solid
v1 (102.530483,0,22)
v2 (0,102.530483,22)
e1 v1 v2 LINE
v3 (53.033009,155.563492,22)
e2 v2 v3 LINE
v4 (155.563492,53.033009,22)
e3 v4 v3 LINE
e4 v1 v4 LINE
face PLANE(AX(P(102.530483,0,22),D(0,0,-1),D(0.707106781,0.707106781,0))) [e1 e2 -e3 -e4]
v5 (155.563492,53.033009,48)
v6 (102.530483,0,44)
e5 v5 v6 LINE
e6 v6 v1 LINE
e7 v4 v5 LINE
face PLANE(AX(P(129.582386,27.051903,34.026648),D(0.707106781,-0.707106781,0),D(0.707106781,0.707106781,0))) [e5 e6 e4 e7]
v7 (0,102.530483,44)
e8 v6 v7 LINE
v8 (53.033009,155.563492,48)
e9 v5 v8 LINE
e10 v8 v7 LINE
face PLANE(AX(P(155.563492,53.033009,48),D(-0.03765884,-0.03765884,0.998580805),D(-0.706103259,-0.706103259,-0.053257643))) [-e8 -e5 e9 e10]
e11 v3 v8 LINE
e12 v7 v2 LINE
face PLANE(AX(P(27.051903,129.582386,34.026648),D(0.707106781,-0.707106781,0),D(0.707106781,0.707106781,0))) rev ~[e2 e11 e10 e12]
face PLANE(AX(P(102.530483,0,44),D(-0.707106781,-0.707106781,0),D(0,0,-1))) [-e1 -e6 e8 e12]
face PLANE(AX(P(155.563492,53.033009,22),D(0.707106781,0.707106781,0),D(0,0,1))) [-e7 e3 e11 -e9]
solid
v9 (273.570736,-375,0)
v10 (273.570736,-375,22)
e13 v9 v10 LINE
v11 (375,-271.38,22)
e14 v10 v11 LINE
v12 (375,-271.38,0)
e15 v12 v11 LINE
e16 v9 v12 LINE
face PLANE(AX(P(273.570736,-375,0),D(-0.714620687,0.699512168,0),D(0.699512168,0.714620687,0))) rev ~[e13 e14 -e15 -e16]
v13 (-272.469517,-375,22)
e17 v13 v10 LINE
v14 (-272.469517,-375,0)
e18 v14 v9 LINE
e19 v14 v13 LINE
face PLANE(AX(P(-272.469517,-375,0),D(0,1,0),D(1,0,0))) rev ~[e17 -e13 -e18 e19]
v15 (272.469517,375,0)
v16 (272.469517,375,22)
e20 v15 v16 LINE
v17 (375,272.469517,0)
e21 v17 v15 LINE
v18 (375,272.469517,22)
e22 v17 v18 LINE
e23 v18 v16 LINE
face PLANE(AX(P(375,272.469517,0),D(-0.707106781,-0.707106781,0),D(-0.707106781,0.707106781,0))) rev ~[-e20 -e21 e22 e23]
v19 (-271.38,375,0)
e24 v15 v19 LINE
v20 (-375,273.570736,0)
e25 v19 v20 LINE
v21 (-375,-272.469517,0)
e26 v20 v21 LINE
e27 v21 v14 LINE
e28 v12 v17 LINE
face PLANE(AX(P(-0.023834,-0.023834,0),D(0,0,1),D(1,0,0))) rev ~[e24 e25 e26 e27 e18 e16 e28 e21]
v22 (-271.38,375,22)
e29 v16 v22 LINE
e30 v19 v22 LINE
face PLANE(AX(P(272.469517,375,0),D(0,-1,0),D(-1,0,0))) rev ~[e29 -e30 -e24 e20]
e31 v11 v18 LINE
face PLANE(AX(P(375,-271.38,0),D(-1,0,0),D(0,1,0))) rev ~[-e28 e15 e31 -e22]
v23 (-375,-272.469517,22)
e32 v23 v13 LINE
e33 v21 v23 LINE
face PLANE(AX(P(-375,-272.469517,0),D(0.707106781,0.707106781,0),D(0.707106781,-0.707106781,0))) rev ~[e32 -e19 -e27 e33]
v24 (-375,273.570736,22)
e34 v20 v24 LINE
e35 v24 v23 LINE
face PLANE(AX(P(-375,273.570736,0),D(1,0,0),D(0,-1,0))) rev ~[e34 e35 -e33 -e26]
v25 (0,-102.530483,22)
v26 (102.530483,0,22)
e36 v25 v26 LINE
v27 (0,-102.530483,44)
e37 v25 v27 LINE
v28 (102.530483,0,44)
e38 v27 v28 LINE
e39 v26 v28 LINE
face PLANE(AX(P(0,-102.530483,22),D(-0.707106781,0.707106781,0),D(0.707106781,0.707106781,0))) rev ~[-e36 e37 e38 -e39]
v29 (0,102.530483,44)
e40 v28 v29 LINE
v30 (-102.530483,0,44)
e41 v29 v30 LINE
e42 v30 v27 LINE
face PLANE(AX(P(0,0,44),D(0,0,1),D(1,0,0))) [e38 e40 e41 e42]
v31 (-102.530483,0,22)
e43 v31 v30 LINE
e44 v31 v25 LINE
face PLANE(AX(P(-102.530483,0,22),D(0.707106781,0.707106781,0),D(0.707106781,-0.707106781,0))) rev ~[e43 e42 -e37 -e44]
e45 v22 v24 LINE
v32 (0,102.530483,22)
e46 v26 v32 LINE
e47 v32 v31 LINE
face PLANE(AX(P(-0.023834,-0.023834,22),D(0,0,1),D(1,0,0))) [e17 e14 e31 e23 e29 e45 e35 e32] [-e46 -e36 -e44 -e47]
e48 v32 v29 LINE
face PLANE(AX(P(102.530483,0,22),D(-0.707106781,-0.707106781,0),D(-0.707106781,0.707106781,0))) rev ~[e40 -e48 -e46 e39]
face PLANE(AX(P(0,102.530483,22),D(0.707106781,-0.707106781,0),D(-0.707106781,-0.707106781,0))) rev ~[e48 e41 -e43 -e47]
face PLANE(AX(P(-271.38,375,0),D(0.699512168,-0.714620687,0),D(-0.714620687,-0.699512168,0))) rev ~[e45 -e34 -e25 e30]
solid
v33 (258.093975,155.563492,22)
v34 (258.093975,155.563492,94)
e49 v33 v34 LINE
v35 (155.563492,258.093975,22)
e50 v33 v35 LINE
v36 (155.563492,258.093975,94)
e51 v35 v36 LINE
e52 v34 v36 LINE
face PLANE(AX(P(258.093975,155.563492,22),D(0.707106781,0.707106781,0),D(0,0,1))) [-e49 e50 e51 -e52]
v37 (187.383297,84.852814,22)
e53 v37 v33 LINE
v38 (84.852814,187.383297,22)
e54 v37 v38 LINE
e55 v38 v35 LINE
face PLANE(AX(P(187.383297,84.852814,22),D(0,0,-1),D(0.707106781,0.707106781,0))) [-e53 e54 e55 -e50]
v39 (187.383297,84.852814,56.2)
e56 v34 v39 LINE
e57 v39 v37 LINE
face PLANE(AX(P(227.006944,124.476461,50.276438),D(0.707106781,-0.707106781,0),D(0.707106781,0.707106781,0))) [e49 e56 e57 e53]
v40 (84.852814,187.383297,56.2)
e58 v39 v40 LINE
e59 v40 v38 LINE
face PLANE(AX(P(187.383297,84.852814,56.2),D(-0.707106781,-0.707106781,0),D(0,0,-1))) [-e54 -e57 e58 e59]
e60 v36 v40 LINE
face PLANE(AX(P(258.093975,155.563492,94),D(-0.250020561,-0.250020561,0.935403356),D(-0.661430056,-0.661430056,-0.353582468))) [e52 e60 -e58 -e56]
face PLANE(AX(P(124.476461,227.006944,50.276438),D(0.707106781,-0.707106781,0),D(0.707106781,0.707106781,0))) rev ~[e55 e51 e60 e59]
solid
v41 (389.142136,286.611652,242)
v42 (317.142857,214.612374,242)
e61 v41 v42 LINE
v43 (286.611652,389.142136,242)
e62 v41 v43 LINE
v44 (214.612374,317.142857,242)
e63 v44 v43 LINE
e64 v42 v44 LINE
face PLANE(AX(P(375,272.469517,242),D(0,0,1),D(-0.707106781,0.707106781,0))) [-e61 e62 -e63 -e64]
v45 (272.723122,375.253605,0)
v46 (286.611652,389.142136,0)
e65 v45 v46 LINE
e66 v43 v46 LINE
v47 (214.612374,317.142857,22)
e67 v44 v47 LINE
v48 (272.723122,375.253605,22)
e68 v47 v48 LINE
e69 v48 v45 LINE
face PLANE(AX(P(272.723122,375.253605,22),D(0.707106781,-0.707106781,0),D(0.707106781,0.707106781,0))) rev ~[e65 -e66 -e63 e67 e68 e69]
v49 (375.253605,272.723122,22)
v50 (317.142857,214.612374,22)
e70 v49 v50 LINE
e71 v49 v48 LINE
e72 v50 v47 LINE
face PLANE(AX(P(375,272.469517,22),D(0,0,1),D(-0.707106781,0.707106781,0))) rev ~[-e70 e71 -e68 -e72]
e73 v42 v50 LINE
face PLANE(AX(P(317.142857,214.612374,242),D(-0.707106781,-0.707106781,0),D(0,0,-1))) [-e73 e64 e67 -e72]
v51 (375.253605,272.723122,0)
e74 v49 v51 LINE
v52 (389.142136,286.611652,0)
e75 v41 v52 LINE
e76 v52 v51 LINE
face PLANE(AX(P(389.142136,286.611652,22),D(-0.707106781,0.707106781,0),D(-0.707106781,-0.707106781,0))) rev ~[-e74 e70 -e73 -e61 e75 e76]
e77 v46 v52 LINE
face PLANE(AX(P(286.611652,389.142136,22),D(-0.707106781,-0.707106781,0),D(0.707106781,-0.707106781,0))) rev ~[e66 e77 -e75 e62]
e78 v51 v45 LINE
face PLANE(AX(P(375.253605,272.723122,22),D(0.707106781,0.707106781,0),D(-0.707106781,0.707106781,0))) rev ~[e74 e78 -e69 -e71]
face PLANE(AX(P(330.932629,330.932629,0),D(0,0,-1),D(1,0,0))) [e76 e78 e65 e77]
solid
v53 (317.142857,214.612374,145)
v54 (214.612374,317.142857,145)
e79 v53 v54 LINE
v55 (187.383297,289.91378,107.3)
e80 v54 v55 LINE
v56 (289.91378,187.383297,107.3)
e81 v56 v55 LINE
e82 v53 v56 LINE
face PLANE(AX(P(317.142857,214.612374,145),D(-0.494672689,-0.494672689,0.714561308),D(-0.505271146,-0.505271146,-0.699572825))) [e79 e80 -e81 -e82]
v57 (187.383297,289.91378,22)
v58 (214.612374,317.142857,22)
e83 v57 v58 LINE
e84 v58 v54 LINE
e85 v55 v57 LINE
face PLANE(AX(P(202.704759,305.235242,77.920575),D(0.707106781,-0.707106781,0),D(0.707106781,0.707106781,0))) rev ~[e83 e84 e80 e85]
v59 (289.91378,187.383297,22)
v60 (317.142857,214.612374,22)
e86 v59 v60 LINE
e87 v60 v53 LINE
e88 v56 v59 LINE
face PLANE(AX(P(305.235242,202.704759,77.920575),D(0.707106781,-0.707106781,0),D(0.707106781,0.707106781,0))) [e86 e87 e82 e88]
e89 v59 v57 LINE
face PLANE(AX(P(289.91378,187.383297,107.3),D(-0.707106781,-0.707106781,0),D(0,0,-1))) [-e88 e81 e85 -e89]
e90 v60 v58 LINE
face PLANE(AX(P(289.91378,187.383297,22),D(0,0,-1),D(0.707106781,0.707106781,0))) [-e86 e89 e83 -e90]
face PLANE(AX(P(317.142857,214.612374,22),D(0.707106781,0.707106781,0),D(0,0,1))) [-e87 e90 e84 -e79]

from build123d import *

# Parameters (mm, degrees)
F1_DEPTH  = 22
F3_DEPTH  = 22
F5_DEPTH  = 145
F6_DEPTH  = 145
F7_DEPTH  = 145
F8_DEPTH  = 145
F9_DEPTH  = 20
F11_DEPTH = 22


with BuildPart() as f1:
    # F0 (on Top) → F1 (new body)
    with BuildSketch(Plane.XY):
        Polygon((272.469516728, 375), (-271.380000358, 375), (-375, 273.5707356125), (-375, -272.469516728), (-272.469516728, -375), (273.5707356125, -375), (375, -271.380000358), (375, 272.469516728), align=None)
    extrude(amount=F1_DEPTH)

    # F2 (on face) → F3 (join)
    with BuildSketch(Plane.XY.offset(22)):
        Polygon((102.530483272, 0), (0, 102.5304832721), (-102.530483272, 0), (0, -102.530483272), align=None)
    extrude(amount=F3_DEPTH)


with BuildPart() as f5:
    # F4 (on face) → F5 (new body)
    with BuildSketch(Plane(origin=(51.265241636, -51.265241636, 0), x_dir=(0.7071067812, 0.7071067812, 0), z_dir=(0.7071067812, -0.7071067812, 0))):
        Polygon((72.5, 44), (72.5, 22), (147.5, 22), (147.5, 48), align=None)
    extrude(amount=-F5_DEPTH)


with BuildPart() as f6:
    # F4 (on face) → F6 (new body)
    with BuildSketch(Plane(origin=(51.265241636, -51.265241636, 0), x_dir=(0.7071067812, 0.7071067812, 0), z_dir=(0.7071067812, -0.7071067812, 0))):
        Polygon((192.5, 56.2), (192.5, 22), (292.5, 22), (292.5, 94), align=None)
    extrude(amount=-F6_DEPTH)


with BuildPart() as f7:
    # F4 (on face) → F7 (new body)
    with BuildSketch(Plane(origin=(51.265241636, -51.265241636, 0), x_dir=(0.7071067812, 0.7071067812, 0), z_dir=(0.7071067812, -0.7071067812, 0))):
        Polygon((337.5, 107.3), (337.5, 22), (376.0077297688, 22), (376.0077297688, 145), align=None)
    extrude(amount=-F7_DEPTH)


with BuildPart() as f8:
    # F4 (on face) → F8 (new body)
    with BuildSketch(Plane(origin=(51.265241636, -51.265241636, 0), x_dir=(0.7071067812, 0.7071067812, 0), z_dir=(0.7071067812, -0.7071067812, 0))):
        Polygon((376.0077297688, 145), (376.0077297688, 22), (457.8300858899, 22), (457.8300858899, 242), (376.0077297688, 242), align=None)
    extrude(amount=-F8_DEPTH)

    # F9 (add): a face of the model
    f9_faces = [f8.faces().sort_by_distance(p)[0] for p in [
        (323.734758364, 323.734758364, 132),
    ]]
    extrude(f9_faces, amount=F9_DEPTH)

    # F10 (on face) → F11 (join)
    with BuildSketch(Plane(origin=(0, 0, 22), x_dir=(1, 0, 0), z_dir=(0, 0, -1))):
        Polygon((272.7231215108, -375.2536047828), (286.6116523517, -389.1421356237), (389.1421356237, -286.6116523517), (375.2536047828, -272.7231215108), align=None)
    extrude(amount=F11_DEPTH)


solid = Compound([f1.part, f5.part, f6.part, f7.part, f8.part])
